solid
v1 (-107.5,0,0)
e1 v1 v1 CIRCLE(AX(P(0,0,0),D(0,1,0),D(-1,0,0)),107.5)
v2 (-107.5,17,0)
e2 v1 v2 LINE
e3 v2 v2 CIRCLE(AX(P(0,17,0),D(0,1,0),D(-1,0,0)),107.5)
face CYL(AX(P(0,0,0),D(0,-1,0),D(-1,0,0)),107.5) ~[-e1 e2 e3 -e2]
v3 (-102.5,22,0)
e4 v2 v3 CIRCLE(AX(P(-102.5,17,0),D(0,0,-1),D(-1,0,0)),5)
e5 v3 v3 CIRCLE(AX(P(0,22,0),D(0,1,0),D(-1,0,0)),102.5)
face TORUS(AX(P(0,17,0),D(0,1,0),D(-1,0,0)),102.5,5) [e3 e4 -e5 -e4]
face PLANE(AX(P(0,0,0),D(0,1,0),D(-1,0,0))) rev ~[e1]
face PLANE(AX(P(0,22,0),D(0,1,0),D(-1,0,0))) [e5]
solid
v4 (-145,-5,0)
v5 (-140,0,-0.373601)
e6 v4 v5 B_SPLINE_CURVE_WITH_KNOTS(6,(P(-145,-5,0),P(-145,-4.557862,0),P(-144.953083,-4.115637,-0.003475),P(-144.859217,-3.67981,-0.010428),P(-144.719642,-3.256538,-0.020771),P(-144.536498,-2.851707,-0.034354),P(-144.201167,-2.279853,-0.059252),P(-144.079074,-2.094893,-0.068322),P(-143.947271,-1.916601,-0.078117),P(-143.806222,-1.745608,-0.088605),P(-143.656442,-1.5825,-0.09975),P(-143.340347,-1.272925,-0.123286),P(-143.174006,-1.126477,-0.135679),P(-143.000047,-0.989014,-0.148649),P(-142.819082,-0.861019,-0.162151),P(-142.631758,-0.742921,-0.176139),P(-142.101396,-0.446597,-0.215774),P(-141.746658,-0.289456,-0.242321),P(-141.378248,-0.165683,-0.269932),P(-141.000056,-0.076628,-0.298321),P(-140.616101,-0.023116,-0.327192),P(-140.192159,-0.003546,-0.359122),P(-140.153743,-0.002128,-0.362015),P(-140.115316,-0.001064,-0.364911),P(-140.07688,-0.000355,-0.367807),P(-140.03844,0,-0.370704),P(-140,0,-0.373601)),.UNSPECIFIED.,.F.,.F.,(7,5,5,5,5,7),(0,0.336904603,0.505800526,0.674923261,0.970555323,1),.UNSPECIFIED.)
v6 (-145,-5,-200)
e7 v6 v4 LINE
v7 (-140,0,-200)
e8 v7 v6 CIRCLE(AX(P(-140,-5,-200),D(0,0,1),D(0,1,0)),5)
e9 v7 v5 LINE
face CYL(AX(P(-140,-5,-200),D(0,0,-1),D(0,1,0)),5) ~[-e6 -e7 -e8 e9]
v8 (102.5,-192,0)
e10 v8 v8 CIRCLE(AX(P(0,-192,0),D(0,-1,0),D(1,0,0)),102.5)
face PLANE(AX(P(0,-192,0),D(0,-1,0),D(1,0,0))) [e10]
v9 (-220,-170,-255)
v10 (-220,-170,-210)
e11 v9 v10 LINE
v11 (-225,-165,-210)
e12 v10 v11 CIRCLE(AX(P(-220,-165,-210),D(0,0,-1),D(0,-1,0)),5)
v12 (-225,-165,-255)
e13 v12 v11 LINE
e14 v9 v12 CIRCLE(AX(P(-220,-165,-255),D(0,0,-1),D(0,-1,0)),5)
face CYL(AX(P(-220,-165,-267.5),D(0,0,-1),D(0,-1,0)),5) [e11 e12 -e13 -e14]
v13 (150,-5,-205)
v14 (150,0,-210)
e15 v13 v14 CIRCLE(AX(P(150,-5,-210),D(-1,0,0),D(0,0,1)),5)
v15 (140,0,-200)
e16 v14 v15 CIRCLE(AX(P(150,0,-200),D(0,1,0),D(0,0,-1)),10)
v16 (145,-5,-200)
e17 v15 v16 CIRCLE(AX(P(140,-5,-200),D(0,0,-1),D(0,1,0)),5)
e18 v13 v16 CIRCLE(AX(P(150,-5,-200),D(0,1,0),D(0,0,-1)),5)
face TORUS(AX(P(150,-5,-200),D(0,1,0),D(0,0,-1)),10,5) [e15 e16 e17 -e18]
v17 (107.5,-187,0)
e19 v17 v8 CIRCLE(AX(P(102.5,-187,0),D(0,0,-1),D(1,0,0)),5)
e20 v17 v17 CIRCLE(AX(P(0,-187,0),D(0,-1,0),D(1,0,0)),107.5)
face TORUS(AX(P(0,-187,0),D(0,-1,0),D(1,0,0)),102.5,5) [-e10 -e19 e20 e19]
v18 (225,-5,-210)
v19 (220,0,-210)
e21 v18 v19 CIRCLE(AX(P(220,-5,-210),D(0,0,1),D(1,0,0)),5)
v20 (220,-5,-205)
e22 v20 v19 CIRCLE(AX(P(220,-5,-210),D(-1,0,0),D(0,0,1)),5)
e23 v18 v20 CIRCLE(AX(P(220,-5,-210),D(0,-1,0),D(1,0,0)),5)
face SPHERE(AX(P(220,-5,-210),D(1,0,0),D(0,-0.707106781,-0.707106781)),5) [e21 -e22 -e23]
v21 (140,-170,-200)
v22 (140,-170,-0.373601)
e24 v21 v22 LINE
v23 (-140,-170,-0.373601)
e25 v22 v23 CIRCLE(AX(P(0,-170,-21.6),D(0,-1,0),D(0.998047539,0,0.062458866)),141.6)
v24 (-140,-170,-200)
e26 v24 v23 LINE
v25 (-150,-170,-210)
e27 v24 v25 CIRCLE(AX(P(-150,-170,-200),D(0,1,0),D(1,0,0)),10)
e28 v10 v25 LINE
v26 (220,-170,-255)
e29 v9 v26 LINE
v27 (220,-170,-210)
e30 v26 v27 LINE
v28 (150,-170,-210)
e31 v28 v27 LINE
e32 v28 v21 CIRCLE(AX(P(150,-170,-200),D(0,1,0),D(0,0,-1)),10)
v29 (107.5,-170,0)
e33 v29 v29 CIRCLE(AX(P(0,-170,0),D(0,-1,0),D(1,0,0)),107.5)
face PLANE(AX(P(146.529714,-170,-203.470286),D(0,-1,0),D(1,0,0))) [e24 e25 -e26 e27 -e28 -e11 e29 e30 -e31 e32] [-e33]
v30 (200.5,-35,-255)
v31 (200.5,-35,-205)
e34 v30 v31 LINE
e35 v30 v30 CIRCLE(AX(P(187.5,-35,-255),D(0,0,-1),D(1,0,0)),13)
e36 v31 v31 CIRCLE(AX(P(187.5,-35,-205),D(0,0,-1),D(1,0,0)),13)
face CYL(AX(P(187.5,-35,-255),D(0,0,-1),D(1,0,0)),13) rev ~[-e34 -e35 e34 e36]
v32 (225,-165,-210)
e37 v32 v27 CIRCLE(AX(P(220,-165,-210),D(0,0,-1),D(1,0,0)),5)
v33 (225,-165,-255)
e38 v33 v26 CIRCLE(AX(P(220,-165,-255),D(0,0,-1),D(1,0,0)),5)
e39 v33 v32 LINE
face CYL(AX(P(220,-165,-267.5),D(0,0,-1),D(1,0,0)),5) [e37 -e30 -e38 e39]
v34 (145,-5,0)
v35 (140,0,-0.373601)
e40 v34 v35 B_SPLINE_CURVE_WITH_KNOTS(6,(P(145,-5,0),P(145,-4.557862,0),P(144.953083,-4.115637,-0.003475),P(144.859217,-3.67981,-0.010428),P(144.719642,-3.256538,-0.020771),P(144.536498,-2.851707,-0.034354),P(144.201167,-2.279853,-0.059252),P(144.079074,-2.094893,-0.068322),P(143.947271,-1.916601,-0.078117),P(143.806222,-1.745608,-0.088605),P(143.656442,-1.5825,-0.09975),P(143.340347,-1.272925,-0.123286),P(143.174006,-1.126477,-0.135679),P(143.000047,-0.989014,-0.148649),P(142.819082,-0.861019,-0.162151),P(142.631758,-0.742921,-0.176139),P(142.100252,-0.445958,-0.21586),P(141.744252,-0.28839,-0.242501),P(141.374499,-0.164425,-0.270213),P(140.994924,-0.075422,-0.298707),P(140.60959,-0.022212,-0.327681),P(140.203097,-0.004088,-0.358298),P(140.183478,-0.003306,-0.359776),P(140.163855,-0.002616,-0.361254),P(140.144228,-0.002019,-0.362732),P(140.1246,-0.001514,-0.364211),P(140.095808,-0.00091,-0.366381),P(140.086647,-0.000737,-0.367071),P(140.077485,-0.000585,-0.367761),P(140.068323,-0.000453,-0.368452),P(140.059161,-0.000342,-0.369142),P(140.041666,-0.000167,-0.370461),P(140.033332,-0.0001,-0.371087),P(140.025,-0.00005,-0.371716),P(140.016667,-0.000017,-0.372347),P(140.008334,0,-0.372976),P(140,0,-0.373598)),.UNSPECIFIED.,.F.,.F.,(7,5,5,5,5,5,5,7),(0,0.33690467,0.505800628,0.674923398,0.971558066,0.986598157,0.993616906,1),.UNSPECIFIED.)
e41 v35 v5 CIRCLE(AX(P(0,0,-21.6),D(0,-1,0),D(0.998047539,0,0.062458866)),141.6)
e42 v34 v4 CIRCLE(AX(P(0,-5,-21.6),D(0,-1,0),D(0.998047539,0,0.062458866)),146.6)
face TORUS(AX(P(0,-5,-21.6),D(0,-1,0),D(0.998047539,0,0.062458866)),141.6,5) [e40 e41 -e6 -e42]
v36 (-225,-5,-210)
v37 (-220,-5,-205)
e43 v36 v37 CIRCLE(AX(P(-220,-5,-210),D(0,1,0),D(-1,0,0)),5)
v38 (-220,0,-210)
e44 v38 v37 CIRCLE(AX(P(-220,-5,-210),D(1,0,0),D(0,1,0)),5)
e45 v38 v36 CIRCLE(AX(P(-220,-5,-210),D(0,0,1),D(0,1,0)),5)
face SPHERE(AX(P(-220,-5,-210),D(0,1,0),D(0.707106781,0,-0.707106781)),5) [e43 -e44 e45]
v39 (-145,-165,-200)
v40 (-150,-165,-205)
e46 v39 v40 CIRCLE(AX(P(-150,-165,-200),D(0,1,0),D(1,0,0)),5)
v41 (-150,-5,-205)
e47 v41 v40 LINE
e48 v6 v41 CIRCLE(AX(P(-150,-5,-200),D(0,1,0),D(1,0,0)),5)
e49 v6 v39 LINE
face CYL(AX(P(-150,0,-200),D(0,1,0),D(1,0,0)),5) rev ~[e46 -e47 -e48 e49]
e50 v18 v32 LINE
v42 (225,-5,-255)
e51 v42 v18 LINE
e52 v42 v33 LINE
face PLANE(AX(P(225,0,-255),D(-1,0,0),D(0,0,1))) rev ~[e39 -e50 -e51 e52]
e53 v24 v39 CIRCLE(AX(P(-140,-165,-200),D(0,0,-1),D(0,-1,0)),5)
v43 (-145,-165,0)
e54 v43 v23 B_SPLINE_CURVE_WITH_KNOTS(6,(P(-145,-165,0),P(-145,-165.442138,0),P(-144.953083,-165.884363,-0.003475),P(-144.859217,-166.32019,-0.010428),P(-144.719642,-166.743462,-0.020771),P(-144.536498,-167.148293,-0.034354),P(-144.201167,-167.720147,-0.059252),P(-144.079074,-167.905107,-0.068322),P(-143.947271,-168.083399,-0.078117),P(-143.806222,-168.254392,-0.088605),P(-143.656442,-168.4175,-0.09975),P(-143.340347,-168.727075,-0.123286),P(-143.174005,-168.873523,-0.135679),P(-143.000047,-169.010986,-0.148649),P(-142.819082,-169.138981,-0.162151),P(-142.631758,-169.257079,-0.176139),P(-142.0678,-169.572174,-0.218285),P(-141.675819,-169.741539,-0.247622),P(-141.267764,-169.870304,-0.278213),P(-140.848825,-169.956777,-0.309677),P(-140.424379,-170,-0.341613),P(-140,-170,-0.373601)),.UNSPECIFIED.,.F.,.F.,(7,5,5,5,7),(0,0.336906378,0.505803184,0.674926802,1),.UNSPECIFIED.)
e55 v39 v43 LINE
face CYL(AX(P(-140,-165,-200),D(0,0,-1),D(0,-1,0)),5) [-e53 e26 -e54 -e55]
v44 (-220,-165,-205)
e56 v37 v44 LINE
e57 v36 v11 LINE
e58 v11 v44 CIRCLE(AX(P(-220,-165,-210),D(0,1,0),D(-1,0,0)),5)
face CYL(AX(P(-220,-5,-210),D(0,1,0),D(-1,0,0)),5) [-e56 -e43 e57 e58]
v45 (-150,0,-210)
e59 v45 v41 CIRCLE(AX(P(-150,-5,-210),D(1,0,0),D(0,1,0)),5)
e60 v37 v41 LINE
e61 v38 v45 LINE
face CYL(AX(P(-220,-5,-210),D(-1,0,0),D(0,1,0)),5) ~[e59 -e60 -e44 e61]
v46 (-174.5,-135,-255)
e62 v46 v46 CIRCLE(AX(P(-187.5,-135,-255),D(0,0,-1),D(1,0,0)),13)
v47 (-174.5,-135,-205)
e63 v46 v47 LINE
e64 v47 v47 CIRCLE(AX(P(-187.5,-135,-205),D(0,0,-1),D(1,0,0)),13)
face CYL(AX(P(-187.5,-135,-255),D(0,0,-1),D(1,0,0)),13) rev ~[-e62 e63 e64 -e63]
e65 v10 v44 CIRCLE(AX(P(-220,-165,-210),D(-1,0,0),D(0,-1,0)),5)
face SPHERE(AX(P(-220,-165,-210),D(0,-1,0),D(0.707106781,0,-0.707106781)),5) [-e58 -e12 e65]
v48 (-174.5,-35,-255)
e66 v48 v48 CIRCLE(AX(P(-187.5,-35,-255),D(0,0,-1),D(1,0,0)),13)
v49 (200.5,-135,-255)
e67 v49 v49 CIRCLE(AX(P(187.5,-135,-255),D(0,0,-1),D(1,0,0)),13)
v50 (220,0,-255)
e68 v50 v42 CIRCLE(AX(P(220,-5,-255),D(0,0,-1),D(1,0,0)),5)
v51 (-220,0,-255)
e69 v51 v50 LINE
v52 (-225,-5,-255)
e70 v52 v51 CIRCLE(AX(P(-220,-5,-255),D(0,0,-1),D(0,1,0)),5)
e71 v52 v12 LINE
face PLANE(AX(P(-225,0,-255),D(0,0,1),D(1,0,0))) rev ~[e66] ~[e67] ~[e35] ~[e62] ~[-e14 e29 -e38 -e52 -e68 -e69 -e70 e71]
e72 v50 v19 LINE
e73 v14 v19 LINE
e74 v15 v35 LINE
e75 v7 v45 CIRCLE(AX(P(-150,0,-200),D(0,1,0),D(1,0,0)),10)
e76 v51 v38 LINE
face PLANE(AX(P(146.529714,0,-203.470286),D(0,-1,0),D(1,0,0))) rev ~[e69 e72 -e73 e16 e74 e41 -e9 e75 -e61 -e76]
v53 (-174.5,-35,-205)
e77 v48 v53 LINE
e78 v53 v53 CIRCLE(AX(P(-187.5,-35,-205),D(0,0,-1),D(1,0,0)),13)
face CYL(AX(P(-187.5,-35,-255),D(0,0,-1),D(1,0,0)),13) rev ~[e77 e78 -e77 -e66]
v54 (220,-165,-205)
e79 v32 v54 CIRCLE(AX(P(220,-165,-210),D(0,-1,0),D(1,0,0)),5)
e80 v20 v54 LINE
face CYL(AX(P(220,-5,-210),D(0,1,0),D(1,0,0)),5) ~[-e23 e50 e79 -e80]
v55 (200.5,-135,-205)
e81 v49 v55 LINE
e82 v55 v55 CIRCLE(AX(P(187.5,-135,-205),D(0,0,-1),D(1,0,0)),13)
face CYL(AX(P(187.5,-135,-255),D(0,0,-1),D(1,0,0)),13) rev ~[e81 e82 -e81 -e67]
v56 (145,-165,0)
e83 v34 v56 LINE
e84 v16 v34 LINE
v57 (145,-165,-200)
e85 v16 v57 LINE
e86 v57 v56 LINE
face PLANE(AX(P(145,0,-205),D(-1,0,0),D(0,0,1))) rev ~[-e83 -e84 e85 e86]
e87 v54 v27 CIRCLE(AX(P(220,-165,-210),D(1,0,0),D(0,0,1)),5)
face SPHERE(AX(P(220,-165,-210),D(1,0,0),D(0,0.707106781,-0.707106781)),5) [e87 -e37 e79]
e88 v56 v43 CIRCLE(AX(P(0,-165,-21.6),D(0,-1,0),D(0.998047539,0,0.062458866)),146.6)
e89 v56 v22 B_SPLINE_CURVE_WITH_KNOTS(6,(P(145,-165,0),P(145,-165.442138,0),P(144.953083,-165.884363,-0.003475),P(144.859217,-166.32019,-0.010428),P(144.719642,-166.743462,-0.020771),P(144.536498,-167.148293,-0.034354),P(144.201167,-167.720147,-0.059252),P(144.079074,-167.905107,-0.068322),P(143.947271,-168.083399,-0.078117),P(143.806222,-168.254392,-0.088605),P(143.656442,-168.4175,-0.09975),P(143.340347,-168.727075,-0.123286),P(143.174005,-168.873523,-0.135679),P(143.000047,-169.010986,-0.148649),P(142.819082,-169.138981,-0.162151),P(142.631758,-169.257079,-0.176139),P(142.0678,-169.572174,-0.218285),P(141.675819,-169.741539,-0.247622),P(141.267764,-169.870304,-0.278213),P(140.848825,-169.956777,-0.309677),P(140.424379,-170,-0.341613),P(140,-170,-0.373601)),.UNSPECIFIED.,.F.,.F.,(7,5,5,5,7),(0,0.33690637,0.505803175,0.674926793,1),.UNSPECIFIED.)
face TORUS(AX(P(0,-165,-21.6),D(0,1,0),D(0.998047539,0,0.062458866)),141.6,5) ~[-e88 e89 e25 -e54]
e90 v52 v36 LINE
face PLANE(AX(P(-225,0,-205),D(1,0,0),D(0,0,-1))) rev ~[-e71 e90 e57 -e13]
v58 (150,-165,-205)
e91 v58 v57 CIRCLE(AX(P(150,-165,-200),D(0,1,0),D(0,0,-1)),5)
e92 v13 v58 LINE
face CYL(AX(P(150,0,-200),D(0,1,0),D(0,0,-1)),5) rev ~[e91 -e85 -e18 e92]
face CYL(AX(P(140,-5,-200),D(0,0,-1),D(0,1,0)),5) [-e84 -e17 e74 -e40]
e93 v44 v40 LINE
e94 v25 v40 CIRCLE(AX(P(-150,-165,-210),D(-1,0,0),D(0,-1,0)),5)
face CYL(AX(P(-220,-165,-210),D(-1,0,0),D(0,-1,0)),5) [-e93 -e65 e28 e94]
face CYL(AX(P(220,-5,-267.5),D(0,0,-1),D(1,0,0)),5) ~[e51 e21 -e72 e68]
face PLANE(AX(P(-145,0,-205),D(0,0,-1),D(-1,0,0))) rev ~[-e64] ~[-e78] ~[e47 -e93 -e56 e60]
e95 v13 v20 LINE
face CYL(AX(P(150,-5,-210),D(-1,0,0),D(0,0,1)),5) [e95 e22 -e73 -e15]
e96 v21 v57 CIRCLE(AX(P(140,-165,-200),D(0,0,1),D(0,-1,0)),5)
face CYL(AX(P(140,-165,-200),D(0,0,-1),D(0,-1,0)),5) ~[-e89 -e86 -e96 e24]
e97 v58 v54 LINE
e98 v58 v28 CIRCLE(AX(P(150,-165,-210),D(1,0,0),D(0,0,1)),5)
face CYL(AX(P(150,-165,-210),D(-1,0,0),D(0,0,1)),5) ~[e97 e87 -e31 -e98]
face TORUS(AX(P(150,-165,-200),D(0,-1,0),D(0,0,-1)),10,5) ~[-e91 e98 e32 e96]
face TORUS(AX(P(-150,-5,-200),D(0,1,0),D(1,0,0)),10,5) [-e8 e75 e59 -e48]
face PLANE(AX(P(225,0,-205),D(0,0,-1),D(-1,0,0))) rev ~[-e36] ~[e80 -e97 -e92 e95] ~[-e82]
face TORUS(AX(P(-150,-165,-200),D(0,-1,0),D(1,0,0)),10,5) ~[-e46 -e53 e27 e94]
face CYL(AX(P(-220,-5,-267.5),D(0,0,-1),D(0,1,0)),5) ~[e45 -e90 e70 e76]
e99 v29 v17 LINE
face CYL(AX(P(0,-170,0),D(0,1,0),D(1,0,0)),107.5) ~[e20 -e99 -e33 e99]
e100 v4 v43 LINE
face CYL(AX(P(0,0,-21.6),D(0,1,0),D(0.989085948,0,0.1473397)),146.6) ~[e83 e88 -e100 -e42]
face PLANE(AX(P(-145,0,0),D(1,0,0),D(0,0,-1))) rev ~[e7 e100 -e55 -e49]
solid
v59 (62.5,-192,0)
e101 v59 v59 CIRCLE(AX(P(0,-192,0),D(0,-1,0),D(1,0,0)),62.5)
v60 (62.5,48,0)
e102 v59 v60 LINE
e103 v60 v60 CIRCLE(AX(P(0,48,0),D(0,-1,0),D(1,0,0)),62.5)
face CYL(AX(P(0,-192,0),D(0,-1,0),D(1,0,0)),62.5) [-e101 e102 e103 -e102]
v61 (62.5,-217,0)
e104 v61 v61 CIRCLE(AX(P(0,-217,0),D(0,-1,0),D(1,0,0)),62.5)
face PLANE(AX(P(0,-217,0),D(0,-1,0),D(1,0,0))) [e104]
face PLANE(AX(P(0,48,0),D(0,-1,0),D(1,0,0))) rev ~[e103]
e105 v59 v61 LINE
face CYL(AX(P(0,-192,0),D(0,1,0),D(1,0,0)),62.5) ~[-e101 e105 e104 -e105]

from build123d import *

# Parameters (mm, degrees)
F1_DEPTH       = 170
F2_R           = 107.5
F3_DEPTH       = 22
F4_R           = 107.5
F5_DEPTH       = 22
F6_R           = 13
F7_DEPTH       = 380.001
F8_T1_DEPTH    = 170
F8_T3_DEPTH    = 57.5
F8_T5_DEPTH    = 160
F8_T7_DEPTH    = 237.5
F8_T9_DEPTH    = 70
F8_T11_DEPTH   = 70
F8_S15_W       = 5.1
F8_S15_H       = 5.1
F8_T16_DEPTH   = 5.1
F8_S21_W       = 5.1
F8_S21_H       = 5.1
F8_T22_DEPTH   = 5.1
F8_S27_W       = 5.1
F8_S27_H       = 5.1
F8_T28_DEPTH   = 5.1
F8_S33_W       = 5.1
F8_S33_H       = 5.1
F8_T34_DEPTH   = 5.1
F8_T38_ANGLE   = 172.8380794601
F8_T40_ANGLE   = 172.8380794601
F8_T44_ANGLE   = 90
F8_T46_ANGLE   = 90
F8_T48_ANGLE   = 90
F8_T50_ANGLE   = 90
F9_R           = 62.5
F10_DEPTH      = 240
F10_DEPTH_BACK = 25


# Not quite as in the source:
# - a fillet or chamfer that OpenCascade refuses, or shapes differently, is made with other operations: its cross-section is extruded or revolved along the edge and cut away or added


with BuildPart() as f1:
    # F0 (on Front) → F1 (new body)
    with BuildSketch(Plane.XZ):
        with BuildLine():
            Line((145, 0), (90, 0))
            ThreePointArc((90, 0), (63.6396103068, -63.6396103068), (0, -90))
            Line((0, -90), (0, -255))
            Line((0, -255), (225, -255))
            Line((225, -255), (225, -205))
            Line((225, -205), (145, -205))
            Line((145, -205), (145, 0))
        make_face()
        with BuildLine():
            ThreePointArc((-90, 0), (0, 90), (90, 0))
            Line((90, 0), (145, 0))
            ThreePointArc((145, 0), (0, 125), (-145, 0))
            Line((-145, 0), (-90, 0))
        make_face()
        with BuildLine():
            ThreePointArc((-55, 0), (0, 55), (55, 0))
            Line((55, 0), (90, 0))
            ThreePointArc((90, 0), (0, 90), (-90, 0))
            Line((-90, 0), (-55, 0))
        make_face()
        with BuildLine():
            ThreePointArc((0, -90), (-63.6396103068, -63.6396103068), (-90, 0))
            Line((-90, 0), (-145, 0))
            Line((-145, 0), (-145, -205))
            Line((-145, -205), (-225, -205))
            Line((-225, -205), (-225, -255))
            Line((-225, -255), (0, -255))
            Line((0, -255), (0, -90))
        make_face()
        with BuildLine():
            ThreePointArc((0, -55), (-38.8908729653, -38.8908729653), (-55, 0))
            Line((-55, 0), (-90, 0))
            ThreePointArc((-90, 0), (-63.6396103068, -63.6396103068), (0, -90))
            Line((0, -90), (0, -55))
        make_face()
        with BuildLine():
            Line((90, 0), (55, 0))
            ThreePointArc((55, 0), (38.8908729653, -38.8908729653), (0, -55))
            Line((0, -55), (0, -90))
            ThreePointArc((0, -90), (63.6396103068, -63.6396103068), (90, 0))
        make_face()
        with BuildLine():
            ThreePointArc((0, -55), (38.8908729653, -38.8908729653), (55, 0))
            Line((55, 0), (0, 0))
            Line((0, 0), (0, -55))
        make_face()
        with BuildLine():
            Line((0, 0), (-55, 0))
            ThreePointArc((-55, 0), (-38.8908729653, -38.8908729653), (0, -55))
            Line((0, -55), (0, 0))
        make_face()
        with BuildLine():
            Line((0, 0), (55, 0))
            ThreePointArc((55, 0), (0, 55), (-55, 0))
            Line((-55, 0), (0, 0))
        make_face()
    extrude(amount=F1_DEPTH)

    # F4 (on face) → F5 (join)
    with BuildSketch(Plane.XZ.offset(170)):
        Circle(F4_R)
    extrude(amount=F5_DEPTH)

    # F6 (on face) → F7 (cut, through all)
    with BuildSketch(Plane(origin=(0, 0, -255), x_dir=(1, 0, 0), z_dir=(0, 0, -1))):
        with Locations((-187.5, 135)):
            Circle(F6_R)
        with Locations((-187.5, 35)):
            Circle(F6_R)
        with Locations((187.5, 135)):
            Circle(F6_R)
        with Locations((187.5, 35)):
            Circle(F6_R)
    extrude(amount=-F7_DEPTH, mode=Mode.SUBTRACT)

    # F8: fillet of radius 5 on 19 edges, made by hand

    # F8_s2 → F8_t1 (join)
    with BuildSketch(Plane.XZ):
        with BuildLine():
            ThreePointArc((150, -205), (146.4644660941, -203.5355339059), (145, -200))
            Line((145, -200), (145, -205))
            Line((145, -205), (150, -205))
        make_face()
        with BuildLine():
            ThreePointArc((-145, -200), (-146.4644660941, -203.5355339059), (-150, -205))
            Line((-150, -205), (-145, -205))
            Line((-145, -205), (-145, -200))
        make_face()
    extrude(amount=F8_T1_DEPTH)

    # F8_s4 → F8_t3 (cut)
    with BuildSketch(Plane.XY.offset(-267.5)):
        with BuildLine():
            ThreePointArc((-220, 0), (-223.5355339059, -1.4644660941), (-225, -5))
            Line((-225, -5), (-225, 0))
            Line((-225, 0), (-220, 0))
        make_face()
        with BuildLine():
            ThreePointArc((-220, -170), (-223.5355339059, -168.5355339059), (-225, -165))
            Line((-225, -165), (-225, -170))
            Line((-225, -170), (-220, -170))
        make_face()
        with BuildLine():
            ThreePointArc((225, -5), (223.5355339059, -1.4644660941), (220, 0))
            Line((220, 0), (225, 0))
            Line((225, 0), (225, -5))
        make_face()
        with BuildLine():
            ThreePointArc((225, -165), (223.5355339059, -168.5355339059), (220, -170))
            Line((220, -170), (225, -170))
            Line((225, -170), (225, -165))
        make_face()
    extrude(amount=F8_T3_DEPTH, mode=Mode.SUBTRACT)

    # F8_s6 → F8_t5 (cut)
    with BuildSketch(Plane.XZ.offset(5)):
        with BuildLine():
            ThreePointArc((-225, -210), (-223.5355339059, -206.4644660941), (-220, -205))
            Line((-220, -205), (-225, -205))
            Line((-225, -205), (-225, -210))
        make_face()
        with BuildLine():
            ThreePointArc((225, -210), (223.5355339059, -206.4644660941), (220, -205))
            Line((220, -205), (225, -205))
            Line((225, -205), (225, -210))
        make_face()
    extrude(amount=F8_T5_DEPTH, mode=Mode.SUBTRACT)

    # F8_s8 → F8_t7 (cut)
    with BuildSketch(Plane.XY.offset(-200)):
        with BuildLine():
            ThreePointArc((-140, 0), (-143.5355339059, -1.4644660941), (-145, -5))
            Line((-145, -5), (-145, 0))
            Line((-145, 0), (-140, 0))
        make_face()
        with BuildLine():
            ThreePointArc((-140, -170), (-143.5355339059, -168.5355339059), (-145, -165))
            Line((-145, -165), (-145, -170))
            Line((-145, -170), (-140, -170))
        make_face()
        with BuildLine():
            ThreePointArc((140, 0), (143.5355339059, -1.4644660941), (145, -5))
            Line((145, -5), (145, 0))
            Line((145, 0), (140, 0))
        make_face()
        with BuildLine():
            ThreePointArc((140, -170), (143.5355339059, -168.5355339059), (145, -165))
            Line((145, -165), (145, -170))
            Line((145, -170), (140, -170))
        make_face()
    extrude(amount=F8_T7_DEPTH, mode=Mode.SUBTRACT)

    # F8_s10 → F8_t9 (cut)
    with BuildSketch(Plane.YZ.offset(-220)):
        with BuildLine():
            ThreePointArc((0, -210), (-1.4644660941, -206.4644660941), (-5, -205))
            Line((-5, -205), (0, -205))
            Line((0, -205), (0, -210))
        make_face()
        with BuildLine():
            ThreePointArc((-170, -210), (-168.5355339059, -206.4644660941), (-165, -205))
            Line((-165, -205), (-170, -205))
            Line((-170, -205), (-170, -210))
        make_face()
    extrude(amount=F8_T9_DEPTH, mode=Mode.SUBTRACT)

    # F8_s12 → F8_t11 (cut)
    with BuildSketch(Plane.YZ.offset(150)):
        with BuildLine():
            ThreePointArc((-5, -205), (-1.4644660941, -206.4644660941), (0, -210))
            Line((0, -210), (0, -205))
            Line((0, -205), (-5, -205))
        make_face()
        with BuildLine():
            ThreePointArc((-165, -205), (-168.5355339059, -206.4644660941), (-170, -210))
            Line((-170, -210), (-170, -205))
            Line((-170, -205), (-165, -205))
        make_face()
    extrude(amount=F8_T11_DEPTH, mode=Mode.SUBTRACT)


with BuildPart() as f3:
    # F2 (on face) → F3 (new body)
    with BuildSketch(Plane(origin=(0, 0, 0), x_dir=(-1, 0, 0), z_dir=(0, 1, 0))):
        Circle(F2_R)
    extrude(amount=F3_DEPTH)

    # F8#2: fillet of radius 5 on 1 edges, made by hand

    # F8_2_s1 → F8_2_t2 (revolve, cut)
    with BuildSketch(Plane.XY):
        with BuildLine():
            ThreePointArc((-107.5, 17), (-106.0355339059, 20.5355339059), (-102.5, 22))
            Line((-102.5, 22), (-107.5, 22))
            Line((-107.5, 22), (-107.5, 17))
        make_face()
    revolve(axis=Axis((0, 22, 0), (0, 1, 0)), mode=Mode.SUBTRACT)


with BuildPart() as f8_tool14:
    # F8_s15 → F8_t16 (new body)
    with BuildSketch(Plane.XZ.offset(5)):
        with Locations((-222.55, -207.45)):
            Rectangle(F8_S15_W, F8_S15_H)
    extrude(amount=-F8_T16_DEPTH)

    # F8_s17 → F8_t18 (revolve, cut)
    with BuildSketch(Plane(origin=(-220, -5, -210), x_dir=(0.7071067812, 0, -0.7071067812), z_dir=(0.7071067812, 0, 0.7071067812))):
        with BuildLine():
            ThreePointArc((0, -5), (5, 0), (0, 5))
            Line((0, 5), (0, -5))
        make_face()
    revolve(axis=Axis((-220, -5, -210), (0, 1, 0)), mode=Mode.SUBTRACT)


with BuildPart() as f1_1:
    add(f1.part)

    # F8_t13: cut F8_tool14
    add(f8_tool14.part, mode=Mode.SUBTRACT)


with BuildPart() as f8_tool20:
    # F8_s21 → F8_t22 (new body)
    with BuildSketch(Plane.XZ.offset(165)):
        with Locations((-222.55, -207.45)):
            Rectangle(F8_S21_W, F8_S21_H)
    extrude(amount=F8_T22_DEPTH)

    # F8_s23 → F8_t24 (revolve, cut)
    with BuildSketch(Plane(origin=(-220, -165, -210), x_dir=(0.7071067812, 0, -0.7071067812), z_dir=(-0.7071067812, 0, -0.7071067812))):
        with BuildLine():
            ThreePointArc((0, -5), (5, 0), (0, 5))
            Line((0, 5), (0, -5))
        make_face()
    revolve(axis=Axis((-220, -165, -210), (0, -1, 0)), mode=Mode.SUBTRACT)


with BuildPart() as f1_2:
    add(f1_1.part)

    # F8_t19: cut F8_tool20
    add(f8_tool20.part, mode=Mode.SUBTRACT)


with BuildPart() as f8_tool26:
    # F8_s27 → F8_t28 (new body)
    with BuildSketch(Plane.YZ.offset(220)):
        with Locations((-2.45, -207.45)):
            Rectangle(F8_S27_W, F8_S27_H)
    extrude(amount=F8_T28_DEPTH)

    # F8_s29 → F8_t30 (revolve, cut)
    with BuildSketch(Plane(origin=(220, -5, -210), x_dir=(0, -0.7071067812, -0.7071067812), z_dir=(0, -0.7071067812, 0.7071067812))):
        with BuildLine():
            ThreePointArc((0, -5), (5, 0), (0, 5))
            Line((0, 5), (0, -5))
        make_face()
    revolve(axis=Axis((220, -5, -210), (1, 0, 0)), mode=Mode.SUBTRACT)


with BuildPart() as f1_3:
    add(f1_2.part)

    # F8_t25: cut F8_tool26
    add(f8_tool26.part, mode=Mode.SUBTRACT)


with BuildPart() as f8_tool32:
    # F8_s33 → F8_t34 (new body)
    with BuildSketch(Plane.YZ.offset(220)):
        with Locations((-167.55, -207.45)):
            Rectangle(F8_S33_W, F8_S33_H)
    extrude(amount=F8_T34_DEPTH)

    # F8_s35 → F8_t36 (revolve, cut)
    with BuildSketch(Plane(origin=(220, -165, -210), x_dir=(0, 0.7071067812, -0.7071067812), z_dir=(0, -0.7071067812, -0.7071067812))):
        with BuildLine():
            ThreePointArc((0, -5), (5, 0), (0, 5))
            Line((0, 5), (0, -5))
        make_face()
    revolve(axis=Axis((220, -165, -210), (1, 0, 0)), mode=Mode.SUBTRACT)


with BuildPart() as f1_4:
    add(f1_3.part)

    # F8_t31: cut F8_tool32
    add(f8_tool32.part, mode=Mode.SUBTRACT)

    # F8_s37 → F8_t38 (revolve, cut)
    with BuildSketch(Plane(origin=(1.3464774141, 0, -21.5157360257), x_dir=(0, 1, 0), z_dir=(0.0624588658, 0, -0.998047539))):
        with BuildLine():
            ThreePointArc((0, 140.2508884983), (-1.4644660941, 143.7864224042), (-5, 145.2508884983))
            Line((-5, 145.2508884983), (0, 145.2508884983))
            Line((0, 145.2508884983), (0, 140.2508884983))
        make_face()
    revolve(axis=Axis((0, 0, -21.6), (0, -1, 0)), revolution_arc=F8_T38_ANGLE, mode=Mode.SUBTRACT)

    # F8_s39 → F8_t40 (revolve, cut)
    with BuildSketch(Plane(origin=(1.3464774141, 0, -21.5157360257), x_dir=(0, 1, 0), z_dir=(0.0624588658, 0, -0.998047539))):
        with BuildLine():
            ThreePointArc((-170, 140.2508884983), (-168.5355339059, 143.7864224042), (-165, 145.2508884983))
            Line((-165, 145.2508884983), (-170, 145.2508884983))
            Line((-170, 145.2508884983), (-170, 140.2508884983))
        make_face()
    revolve(axis=Axis((0, -170, -21.6), (0, -1, 0)), revolution_arc=F8_T40_ANGLE, mode=Mode.SUBTRACT)

    # F8_s41 → F8_t42 (revolve, cut)
    with BuildSketch(Plane.XY):
        with BuildLine():
            ThreePointArc((107.5, -187), (106.0355339059, -190.5355339059), (102.5, -192))
            Line((102.5, -192), (107.5, -192))
            Line((107.5, -192), (107.5, -187))
        make_face()
    revolve(axis=Axis((0, -192, 0), (0, -1, 0)), mode=Mode.SUBTRACT)

    # F8_s43 → F8_t44 (revolve, cut)
    with BuildSketch(Plane.YZ.offset(150)):
        with BuildLine():
            ThreePointArc((-170, -210), (-168.5355339059, -206.4644660941), (-165, -205))
            Line((-165, -205), (-170, -205))
            Line((-170, -205), (-170, -210))
        make_face()
    revolve(axis=Axis((150, -170, -200), (0, 1, 0)), revolution_arc=F8_T44_ANGLE, mode=Mode.SUBTRACT)

    # F8_s45 → F8_t46 (revolve, cut)
    with BuildSketch(Plane.YZ.offset(150)):
        with BuildLine():
            ThreePointArc((0, -210), (-1.4644660941, -206.4644660941), (-5, -205))
            Line((-5, -205), (0, -205))
            Line((0, -205), (0, -210))
        make_face()
    revolve(axis=Axis((150, 0, -200), (0, 1, 0)), revolution_arc=F8_T46_ANGLE, mode=Mode.SUBTRACT)

    # F8_s47 → F8_t48 (revolve, cut)
    with BuildSketch(Plane.XY.offset(-200)):
        with BuildLine():
            ThreePointArc((-140, -170), (-143.5355339059, -168.5355339059), (-145, -165))
            Line((-145, -165), (-145, -170))
            Line((-145, -170), (-140, -170))
        make_face()
    revolve(axis=Axis((-150, -170, -200), (0, 1, 0)), revolution_arc=F8_T48_ANGLE, mode=Mode.SUBTRACT)

    # F8_s49 → F8_t50 (revolve, cut)
    with BuildSketch(Plane.XY.offset(-200)):
        with BuildLine():
            ThreePointArc((-140, 0), (-143.5355339059, -1.4644660941), (-145, -5))
            Line((-145, -5), (-145, 0))
            Line((-145, 0), (-140, 0))
        make_face()
    revolve(axis=Axis((-150, 0, -200), (0, 1, 0)), revolution_arc=F8_T50_ANGLE, mode=Mode.SUBTRACT)


with BuildPart() as f10:
    # F9 (on face) → F10 (new body, two sides)
    with BuildSketch(Plane.XZ.offset(192)) as f10_sk:
        Circle(F9_R)
    extrude(amount=-F10_DEPTH)
    extrude(f10_sk.sketch, amount=F10_DEPTH_BACK)


solid = Compound([f3.part, f1_4.part, f10.part])
